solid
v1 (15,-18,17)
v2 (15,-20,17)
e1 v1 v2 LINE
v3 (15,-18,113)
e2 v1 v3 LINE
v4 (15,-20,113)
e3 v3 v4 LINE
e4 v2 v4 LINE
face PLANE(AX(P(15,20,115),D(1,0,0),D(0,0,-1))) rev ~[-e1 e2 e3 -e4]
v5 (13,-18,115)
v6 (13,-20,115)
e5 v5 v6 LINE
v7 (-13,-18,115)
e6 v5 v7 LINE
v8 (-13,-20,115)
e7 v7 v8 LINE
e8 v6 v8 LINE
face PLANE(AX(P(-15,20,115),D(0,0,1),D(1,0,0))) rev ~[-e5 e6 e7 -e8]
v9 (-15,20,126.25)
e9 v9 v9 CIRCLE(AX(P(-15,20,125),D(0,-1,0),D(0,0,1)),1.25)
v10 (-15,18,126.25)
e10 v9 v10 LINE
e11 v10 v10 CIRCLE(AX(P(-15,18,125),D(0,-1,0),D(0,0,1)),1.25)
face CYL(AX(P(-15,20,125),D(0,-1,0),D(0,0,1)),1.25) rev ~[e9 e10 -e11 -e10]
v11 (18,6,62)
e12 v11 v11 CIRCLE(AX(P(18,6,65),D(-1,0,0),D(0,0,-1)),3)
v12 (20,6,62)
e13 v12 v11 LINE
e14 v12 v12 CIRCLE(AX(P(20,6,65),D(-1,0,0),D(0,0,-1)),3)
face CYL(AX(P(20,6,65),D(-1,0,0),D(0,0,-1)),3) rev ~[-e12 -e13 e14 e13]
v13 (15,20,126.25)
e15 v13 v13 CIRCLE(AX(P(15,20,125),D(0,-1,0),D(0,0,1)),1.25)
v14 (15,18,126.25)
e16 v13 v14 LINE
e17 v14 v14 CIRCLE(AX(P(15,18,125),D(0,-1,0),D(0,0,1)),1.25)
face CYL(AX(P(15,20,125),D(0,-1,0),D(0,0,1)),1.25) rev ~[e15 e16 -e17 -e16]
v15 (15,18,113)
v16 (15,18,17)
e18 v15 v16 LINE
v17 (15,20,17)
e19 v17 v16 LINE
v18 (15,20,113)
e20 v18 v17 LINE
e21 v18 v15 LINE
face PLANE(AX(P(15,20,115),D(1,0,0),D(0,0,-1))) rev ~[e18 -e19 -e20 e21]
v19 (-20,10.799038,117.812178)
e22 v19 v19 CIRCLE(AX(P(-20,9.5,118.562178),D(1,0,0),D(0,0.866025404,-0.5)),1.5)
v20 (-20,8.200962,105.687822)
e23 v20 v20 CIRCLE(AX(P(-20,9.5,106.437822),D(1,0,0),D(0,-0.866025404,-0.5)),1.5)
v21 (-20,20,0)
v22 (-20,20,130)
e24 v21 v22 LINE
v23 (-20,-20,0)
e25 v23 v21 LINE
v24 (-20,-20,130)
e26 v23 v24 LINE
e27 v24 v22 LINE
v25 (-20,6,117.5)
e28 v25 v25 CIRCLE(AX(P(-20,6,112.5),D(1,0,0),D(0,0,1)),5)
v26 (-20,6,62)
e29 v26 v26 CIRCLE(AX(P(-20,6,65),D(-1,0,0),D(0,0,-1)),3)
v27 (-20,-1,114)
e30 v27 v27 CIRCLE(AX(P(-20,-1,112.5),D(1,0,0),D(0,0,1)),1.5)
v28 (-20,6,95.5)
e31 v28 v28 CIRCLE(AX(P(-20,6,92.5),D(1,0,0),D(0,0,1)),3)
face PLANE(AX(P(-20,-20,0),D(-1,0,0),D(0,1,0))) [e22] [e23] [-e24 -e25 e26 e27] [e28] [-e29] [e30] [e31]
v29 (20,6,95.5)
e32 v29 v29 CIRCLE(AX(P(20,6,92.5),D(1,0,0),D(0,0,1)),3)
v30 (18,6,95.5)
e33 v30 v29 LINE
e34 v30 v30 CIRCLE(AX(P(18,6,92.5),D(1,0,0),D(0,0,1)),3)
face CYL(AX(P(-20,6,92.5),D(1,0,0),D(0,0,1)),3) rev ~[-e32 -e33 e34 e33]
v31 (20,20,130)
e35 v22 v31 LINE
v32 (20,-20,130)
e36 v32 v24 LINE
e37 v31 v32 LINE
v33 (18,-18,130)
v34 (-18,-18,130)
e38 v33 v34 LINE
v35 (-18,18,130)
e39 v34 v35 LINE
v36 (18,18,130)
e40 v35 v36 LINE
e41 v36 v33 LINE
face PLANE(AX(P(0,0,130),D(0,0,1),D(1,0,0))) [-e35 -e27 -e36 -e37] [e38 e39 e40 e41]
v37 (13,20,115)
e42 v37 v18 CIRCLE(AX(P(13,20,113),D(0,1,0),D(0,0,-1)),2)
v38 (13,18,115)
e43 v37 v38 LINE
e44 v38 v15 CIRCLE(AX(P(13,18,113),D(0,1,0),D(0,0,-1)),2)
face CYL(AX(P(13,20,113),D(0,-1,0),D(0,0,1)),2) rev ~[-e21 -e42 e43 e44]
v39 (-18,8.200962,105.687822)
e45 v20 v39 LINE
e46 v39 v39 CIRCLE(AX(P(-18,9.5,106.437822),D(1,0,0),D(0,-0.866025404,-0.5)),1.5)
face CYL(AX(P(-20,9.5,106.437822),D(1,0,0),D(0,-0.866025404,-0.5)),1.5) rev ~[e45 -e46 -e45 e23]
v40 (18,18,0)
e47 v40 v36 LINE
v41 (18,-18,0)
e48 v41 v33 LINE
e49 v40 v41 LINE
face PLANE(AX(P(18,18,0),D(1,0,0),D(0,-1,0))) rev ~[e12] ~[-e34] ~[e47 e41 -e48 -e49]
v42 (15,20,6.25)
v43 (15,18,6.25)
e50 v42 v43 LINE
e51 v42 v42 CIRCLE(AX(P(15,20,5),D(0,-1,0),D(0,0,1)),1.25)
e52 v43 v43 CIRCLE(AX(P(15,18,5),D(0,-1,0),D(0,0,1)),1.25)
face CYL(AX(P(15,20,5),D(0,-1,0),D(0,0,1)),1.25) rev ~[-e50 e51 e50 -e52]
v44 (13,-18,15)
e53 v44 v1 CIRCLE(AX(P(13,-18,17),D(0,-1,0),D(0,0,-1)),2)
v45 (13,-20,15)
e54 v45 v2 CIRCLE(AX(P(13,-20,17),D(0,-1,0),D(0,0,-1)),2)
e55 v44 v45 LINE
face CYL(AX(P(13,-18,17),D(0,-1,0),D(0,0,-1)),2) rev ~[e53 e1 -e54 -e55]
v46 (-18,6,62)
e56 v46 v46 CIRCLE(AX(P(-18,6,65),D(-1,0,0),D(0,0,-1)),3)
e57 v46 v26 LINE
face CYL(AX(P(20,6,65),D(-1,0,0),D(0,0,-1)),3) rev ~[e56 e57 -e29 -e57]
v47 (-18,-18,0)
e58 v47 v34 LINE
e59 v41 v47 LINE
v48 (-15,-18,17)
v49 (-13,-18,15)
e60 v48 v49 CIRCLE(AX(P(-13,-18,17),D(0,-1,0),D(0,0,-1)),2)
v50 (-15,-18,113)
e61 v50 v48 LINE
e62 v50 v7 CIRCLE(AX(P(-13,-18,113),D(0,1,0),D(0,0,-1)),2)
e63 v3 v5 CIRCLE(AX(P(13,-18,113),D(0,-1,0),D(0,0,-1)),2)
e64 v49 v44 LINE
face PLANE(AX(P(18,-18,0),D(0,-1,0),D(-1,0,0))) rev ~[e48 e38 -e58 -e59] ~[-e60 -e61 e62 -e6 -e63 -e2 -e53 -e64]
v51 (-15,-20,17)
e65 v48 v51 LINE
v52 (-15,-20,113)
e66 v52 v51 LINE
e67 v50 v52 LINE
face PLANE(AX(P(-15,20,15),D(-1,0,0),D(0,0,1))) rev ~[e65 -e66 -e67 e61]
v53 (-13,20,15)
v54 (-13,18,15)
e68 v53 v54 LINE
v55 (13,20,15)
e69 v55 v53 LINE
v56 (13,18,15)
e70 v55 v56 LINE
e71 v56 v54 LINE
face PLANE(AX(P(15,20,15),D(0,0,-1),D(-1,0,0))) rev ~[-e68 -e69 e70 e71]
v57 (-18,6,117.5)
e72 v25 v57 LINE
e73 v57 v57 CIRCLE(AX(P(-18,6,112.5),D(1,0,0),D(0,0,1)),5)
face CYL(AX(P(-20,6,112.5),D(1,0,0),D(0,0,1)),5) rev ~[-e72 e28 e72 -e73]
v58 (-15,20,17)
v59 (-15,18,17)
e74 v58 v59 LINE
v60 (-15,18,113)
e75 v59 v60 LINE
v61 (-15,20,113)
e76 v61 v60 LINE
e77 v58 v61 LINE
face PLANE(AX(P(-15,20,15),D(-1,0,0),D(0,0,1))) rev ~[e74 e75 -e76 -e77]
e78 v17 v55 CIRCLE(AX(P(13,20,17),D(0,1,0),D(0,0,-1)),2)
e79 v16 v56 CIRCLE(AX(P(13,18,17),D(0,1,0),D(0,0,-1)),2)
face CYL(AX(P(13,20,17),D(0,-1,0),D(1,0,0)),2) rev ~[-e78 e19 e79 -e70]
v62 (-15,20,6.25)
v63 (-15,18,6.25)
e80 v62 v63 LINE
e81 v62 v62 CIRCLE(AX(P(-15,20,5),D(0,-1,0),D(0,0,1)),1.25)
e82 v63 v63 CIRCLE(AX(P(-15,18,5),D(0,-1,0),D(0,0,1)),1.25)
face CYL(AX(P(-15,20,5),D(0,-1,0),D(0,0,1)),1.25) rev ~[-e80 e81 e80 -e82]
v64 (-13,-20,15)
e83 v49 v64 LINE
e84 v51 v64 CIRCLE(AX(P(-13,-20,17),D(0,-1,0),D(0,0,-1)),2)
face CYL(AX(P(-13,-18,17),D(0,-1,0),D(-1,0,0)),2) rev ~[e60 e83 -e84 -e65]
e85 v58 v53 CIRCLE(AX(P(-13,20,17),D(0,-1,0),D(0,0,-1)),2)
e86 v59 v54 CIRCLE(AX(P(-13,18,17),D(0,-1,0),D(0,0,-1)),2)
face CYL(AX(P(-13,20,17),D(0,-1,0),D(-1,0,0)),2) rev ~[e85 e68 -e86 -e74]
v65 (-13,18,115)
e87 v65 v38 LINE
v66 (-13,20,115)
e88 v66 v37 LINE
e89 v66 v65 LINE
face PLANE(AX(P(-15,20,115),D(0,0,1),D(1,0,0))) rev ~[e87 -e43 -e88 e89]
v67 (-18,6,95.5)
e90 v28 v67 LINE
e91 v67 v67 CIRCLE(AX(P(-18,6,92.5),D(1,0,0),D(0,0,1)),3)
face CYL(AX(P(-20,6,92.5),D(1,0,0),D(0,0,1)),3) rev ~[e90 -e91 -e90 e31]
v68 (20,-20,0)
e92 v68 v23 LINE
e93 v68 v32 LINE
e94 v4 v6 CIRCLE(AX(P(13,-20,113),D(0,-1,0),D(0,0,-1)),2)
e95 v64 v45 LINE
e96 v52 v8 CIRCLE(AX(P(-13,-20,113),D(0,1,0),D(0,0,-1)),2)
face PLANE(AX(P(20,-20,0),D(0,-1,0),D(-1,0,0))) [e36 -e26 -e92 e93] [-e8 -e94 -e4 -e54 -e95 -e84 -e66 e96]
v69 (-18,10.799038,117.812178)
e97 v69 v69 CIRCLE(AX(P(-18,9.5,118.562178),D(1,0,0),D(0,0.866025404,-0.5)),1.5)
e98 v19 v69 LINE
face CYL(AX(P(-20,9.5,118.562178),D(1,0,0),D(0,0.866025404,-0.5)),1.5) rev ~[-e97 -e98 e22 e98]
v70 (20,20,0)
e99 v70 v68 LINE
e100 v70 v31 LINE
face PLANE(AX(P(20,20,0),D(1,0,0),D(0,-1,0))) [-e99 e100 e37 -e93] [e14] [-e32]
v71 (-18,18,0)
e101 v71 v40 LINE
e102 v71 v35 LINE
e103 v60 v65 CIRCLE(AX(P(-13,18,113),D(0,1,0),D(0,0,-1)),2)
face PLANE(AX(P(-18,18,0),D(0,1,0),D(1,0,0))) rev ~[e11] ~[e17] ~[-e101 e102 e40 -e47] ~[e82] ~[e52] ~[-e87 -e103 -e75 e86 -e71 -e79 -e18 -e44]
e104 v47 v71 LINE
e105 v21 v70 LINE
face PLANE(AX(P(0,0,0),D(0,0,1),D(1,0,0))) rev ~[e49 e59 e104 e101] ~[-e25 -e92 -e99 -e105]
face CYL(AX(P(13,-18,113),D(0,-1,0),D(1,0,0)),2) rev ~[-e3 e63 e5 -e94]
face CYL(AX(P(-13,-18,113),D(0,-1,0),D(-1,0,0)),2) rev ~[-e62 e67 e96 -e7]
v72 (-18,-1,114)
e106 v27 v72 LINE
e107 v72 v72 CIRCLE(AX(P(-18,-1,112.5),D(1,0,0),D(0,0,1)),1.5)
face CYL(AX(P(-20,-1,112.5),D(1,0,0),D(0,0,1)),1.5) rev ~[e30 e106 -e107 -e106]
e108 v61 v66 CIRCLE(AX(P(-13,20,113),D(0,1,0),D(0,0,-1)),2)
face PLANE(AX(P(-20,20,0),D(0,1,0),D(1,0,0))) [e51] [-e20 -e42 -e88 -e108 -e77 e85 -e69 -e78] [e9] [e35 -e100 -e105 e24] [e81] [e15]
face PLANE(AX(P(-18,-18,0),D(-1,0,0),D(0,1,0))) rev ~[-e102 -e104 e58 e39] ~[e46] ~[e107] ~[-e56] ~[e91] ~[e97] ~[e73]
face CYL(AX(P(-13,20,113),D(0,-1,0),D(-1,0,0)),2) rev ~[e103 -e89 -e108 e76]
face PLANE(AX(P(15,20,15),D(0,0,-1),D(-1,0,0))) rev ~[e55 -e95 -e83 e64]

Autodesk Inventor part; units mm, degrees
ref_plane "YZ Plane" through (0, 0, 0) normal (1, 0, 0) x (0, 1, 0)
ref_plane "XZ Plane" through (0, 0, 0) normal (0, 1, 0) x (-1, 0, 0)
ref_plane "XY Plane" through (0, 0, 0) normal (0, 0, 1) x (1, 0, 0)
sketch "スケッチ1" plane through (0, 0, 0) normal (0, 0, 1) x (1, 0, 0)
  line L0 (-20, 20) -> (20, 20)
  line L1 (20, 20) -> (20, -20)
  line L2 (20, -20) -> (-20, -20)
  line L3 (-20, -20) -> (-20, 20)
  line L4 (-20, 20) -> (20, -20) construction
  line L5 (20, 20) -> (-20, -20) construction
  line L6 (-18, 18) -> (18, 18)
  line L7 (18, 18) -> (18, -18)
  line L8 (18, -18) -> (-18, -18)
  line L9 (-18, -18) -> (-18, 18)
  line L10 (-18, 18) -> (18, -18) construction
  line L11 (18, 18) -> (-18, -18) construction
  point P0 (0, 0)
  point P1 (0, 0)
  dimension "d0" = 40
  dimension "d1" = 40
  dimension "d2" = 2
  dimension "d3" = 2
extrude "押し出し1" add sketch "スケッチ1" along normal blind 130
sketch "スケッチ3" plane through (-20, 20, 0) normal (0, 1, 0) x (1, 0, 0)
  line L0 (5, -115) -> (35, -115)
  line L1 (35, -115) -> (35, -15)
  line L2 (35, -15) -> (5, -15)
  line L3 (5, -15) -> (5, -115)
  line L4 (40, -130) -> (0, -130) projected
  line L5 (0, 0) -> (40, 0) projected
  line L6 (40, 0) -> (40, -130) projected
  line L7 (0, 0) -> (0, -130) projected
  point P0 (20, 0)
  dimension "d6" = 15
  dimension "d7" = 15
  dimension "d8" = 5
  dimension "d9" = 5
extrude "押し出し2" cut sketch "スケッチ3" against normal blind 100 contours L3 L2 L1 L0
fillet "フィレット1" radius 2 8 edges at (-15, 19, 115) (-15, 19, 15) (15, 19, 15) (15, 19, 115) (15, -19, 115) (-15, -19, 115) (-15, -19, 15) (15, -19, 15)
sketch "スケッチ4" plane through (-20, 20, 0) normal (0, 1, 0) x (1, 0, 0)
  line L0 (0, 0) -> (0, -130) projected
  line L1 (0, 0) -> (40, 0) projected
  line L2 (40, 0) -> (40, -130) projected
  line L3 (40, -130) -> (0, -130) projected
  point P0 (20, 0)
  point P1 (5, -5)
  point P2 (5, -125)
  point P3 (35, -125)
  point P4 (35, -5)
  dimension "d13" = 5
  dimension "d14" = 5
  dimension "d15" = 5
  dimension "d16" = 5
  dimension "d17" = 5
  dimension "d18" = 5
  dimension "d19" = 5
  dimension "d20" = 5
hole "穴1" at (-15, 20, 5) at (-15, 20, 125) at (15, 20, 125) at (15, 20, 5) direction (0, -1, 0) diameter 2.5 end up to surface
thread "ねじ1" size "M2.5x0.45" class "6H" standard "ANSI Metric M Profile" full length
thread "ねじ2" size "M2.5x0.45" class "6H" standard "ANSI Metric M Profile" full length
thread "ねじ3" size "M2.5x0.45" class "6H" standard "ANSI Metric M Profile" full length
thread "ねじ4" size "M2.5x0.45" class "6H" standard "ANSI Metric M Profile" full length
sketch "スケッチ5" plane through (20, -20, 0) normal (1, 0, 0) x (0, 0, -1)
  line L0 (0, 40) -> (0, 0) projected
  line L1 (0, 40) -> (-130, 40) projected
  line L2 (-130, 40) -> (-130, 0) projected
  point P0 (0, 20)
  point P1 (-65, 26)
  dimension "d37" = 14
  dimension "d67" = 65
hole "穴2" at (20, 6, 65) direction (-1, 0, 0) diameter 6 end through all
sketch "スケッチ6" plane through (-20, -20, 0) normal (-1, 0, 0) x (0, 0, 1)
  line L0 (0, 0) -> (0, 40) projected
  line L1 (0, 40) -> (130, 40) projected
  line L2 (130, 40) -> (130, 0) projected
  point P0 (0, 20)
  point P1 (112.5, 26)
  dimension "d46" = 14
  dimension "d54" = 17.5
hole "穴3" at (-20, 6, 112.5) direction (1, 0, 0) diameter 10 depth 8
sketch "スケッチ7" plane through (-20, -20, 0) normal (-1, 0, 0) x (0, 0, 1)
  line L0 (0, 40) -> (130, 40) projected
  line L1 (130, 40) -> (130, 0) projected
  point P0 (0, 20)
  point P1 (112.5, 19)
  dimension "d55" = 21
  dimension "d56" = 17.5
hole "穴4" at (-20, -1, 112.5) direction (1, 0, 0) diameter 3 depth 8
pattern_circular "円形状パターン1" count 3 over 360 about axis through (-16, 6, 112.5) along (-1, 0, 0) of "穴4"
sketch "スケッチ8" plane through (-20, -20, 0) normal (-1, 0, 0) x (0, 0, 1)
  line L0 (130, 40) -> (130, 0) projected
  line L1 (0, 0) -> (130, 0) projected
  line L2 (0, 40) -> (130, 40) projected
  point P0 (0, 20)
  point P1 (92.5, 26)
  dimension "d68" = 37.5
  dimension "d77" = 14
hole "穴5" at (-20, 6, 92.5) direction (1, 0, 0) diameter 6 end through all
properties part number "Gear box" material "アルミニウム"
